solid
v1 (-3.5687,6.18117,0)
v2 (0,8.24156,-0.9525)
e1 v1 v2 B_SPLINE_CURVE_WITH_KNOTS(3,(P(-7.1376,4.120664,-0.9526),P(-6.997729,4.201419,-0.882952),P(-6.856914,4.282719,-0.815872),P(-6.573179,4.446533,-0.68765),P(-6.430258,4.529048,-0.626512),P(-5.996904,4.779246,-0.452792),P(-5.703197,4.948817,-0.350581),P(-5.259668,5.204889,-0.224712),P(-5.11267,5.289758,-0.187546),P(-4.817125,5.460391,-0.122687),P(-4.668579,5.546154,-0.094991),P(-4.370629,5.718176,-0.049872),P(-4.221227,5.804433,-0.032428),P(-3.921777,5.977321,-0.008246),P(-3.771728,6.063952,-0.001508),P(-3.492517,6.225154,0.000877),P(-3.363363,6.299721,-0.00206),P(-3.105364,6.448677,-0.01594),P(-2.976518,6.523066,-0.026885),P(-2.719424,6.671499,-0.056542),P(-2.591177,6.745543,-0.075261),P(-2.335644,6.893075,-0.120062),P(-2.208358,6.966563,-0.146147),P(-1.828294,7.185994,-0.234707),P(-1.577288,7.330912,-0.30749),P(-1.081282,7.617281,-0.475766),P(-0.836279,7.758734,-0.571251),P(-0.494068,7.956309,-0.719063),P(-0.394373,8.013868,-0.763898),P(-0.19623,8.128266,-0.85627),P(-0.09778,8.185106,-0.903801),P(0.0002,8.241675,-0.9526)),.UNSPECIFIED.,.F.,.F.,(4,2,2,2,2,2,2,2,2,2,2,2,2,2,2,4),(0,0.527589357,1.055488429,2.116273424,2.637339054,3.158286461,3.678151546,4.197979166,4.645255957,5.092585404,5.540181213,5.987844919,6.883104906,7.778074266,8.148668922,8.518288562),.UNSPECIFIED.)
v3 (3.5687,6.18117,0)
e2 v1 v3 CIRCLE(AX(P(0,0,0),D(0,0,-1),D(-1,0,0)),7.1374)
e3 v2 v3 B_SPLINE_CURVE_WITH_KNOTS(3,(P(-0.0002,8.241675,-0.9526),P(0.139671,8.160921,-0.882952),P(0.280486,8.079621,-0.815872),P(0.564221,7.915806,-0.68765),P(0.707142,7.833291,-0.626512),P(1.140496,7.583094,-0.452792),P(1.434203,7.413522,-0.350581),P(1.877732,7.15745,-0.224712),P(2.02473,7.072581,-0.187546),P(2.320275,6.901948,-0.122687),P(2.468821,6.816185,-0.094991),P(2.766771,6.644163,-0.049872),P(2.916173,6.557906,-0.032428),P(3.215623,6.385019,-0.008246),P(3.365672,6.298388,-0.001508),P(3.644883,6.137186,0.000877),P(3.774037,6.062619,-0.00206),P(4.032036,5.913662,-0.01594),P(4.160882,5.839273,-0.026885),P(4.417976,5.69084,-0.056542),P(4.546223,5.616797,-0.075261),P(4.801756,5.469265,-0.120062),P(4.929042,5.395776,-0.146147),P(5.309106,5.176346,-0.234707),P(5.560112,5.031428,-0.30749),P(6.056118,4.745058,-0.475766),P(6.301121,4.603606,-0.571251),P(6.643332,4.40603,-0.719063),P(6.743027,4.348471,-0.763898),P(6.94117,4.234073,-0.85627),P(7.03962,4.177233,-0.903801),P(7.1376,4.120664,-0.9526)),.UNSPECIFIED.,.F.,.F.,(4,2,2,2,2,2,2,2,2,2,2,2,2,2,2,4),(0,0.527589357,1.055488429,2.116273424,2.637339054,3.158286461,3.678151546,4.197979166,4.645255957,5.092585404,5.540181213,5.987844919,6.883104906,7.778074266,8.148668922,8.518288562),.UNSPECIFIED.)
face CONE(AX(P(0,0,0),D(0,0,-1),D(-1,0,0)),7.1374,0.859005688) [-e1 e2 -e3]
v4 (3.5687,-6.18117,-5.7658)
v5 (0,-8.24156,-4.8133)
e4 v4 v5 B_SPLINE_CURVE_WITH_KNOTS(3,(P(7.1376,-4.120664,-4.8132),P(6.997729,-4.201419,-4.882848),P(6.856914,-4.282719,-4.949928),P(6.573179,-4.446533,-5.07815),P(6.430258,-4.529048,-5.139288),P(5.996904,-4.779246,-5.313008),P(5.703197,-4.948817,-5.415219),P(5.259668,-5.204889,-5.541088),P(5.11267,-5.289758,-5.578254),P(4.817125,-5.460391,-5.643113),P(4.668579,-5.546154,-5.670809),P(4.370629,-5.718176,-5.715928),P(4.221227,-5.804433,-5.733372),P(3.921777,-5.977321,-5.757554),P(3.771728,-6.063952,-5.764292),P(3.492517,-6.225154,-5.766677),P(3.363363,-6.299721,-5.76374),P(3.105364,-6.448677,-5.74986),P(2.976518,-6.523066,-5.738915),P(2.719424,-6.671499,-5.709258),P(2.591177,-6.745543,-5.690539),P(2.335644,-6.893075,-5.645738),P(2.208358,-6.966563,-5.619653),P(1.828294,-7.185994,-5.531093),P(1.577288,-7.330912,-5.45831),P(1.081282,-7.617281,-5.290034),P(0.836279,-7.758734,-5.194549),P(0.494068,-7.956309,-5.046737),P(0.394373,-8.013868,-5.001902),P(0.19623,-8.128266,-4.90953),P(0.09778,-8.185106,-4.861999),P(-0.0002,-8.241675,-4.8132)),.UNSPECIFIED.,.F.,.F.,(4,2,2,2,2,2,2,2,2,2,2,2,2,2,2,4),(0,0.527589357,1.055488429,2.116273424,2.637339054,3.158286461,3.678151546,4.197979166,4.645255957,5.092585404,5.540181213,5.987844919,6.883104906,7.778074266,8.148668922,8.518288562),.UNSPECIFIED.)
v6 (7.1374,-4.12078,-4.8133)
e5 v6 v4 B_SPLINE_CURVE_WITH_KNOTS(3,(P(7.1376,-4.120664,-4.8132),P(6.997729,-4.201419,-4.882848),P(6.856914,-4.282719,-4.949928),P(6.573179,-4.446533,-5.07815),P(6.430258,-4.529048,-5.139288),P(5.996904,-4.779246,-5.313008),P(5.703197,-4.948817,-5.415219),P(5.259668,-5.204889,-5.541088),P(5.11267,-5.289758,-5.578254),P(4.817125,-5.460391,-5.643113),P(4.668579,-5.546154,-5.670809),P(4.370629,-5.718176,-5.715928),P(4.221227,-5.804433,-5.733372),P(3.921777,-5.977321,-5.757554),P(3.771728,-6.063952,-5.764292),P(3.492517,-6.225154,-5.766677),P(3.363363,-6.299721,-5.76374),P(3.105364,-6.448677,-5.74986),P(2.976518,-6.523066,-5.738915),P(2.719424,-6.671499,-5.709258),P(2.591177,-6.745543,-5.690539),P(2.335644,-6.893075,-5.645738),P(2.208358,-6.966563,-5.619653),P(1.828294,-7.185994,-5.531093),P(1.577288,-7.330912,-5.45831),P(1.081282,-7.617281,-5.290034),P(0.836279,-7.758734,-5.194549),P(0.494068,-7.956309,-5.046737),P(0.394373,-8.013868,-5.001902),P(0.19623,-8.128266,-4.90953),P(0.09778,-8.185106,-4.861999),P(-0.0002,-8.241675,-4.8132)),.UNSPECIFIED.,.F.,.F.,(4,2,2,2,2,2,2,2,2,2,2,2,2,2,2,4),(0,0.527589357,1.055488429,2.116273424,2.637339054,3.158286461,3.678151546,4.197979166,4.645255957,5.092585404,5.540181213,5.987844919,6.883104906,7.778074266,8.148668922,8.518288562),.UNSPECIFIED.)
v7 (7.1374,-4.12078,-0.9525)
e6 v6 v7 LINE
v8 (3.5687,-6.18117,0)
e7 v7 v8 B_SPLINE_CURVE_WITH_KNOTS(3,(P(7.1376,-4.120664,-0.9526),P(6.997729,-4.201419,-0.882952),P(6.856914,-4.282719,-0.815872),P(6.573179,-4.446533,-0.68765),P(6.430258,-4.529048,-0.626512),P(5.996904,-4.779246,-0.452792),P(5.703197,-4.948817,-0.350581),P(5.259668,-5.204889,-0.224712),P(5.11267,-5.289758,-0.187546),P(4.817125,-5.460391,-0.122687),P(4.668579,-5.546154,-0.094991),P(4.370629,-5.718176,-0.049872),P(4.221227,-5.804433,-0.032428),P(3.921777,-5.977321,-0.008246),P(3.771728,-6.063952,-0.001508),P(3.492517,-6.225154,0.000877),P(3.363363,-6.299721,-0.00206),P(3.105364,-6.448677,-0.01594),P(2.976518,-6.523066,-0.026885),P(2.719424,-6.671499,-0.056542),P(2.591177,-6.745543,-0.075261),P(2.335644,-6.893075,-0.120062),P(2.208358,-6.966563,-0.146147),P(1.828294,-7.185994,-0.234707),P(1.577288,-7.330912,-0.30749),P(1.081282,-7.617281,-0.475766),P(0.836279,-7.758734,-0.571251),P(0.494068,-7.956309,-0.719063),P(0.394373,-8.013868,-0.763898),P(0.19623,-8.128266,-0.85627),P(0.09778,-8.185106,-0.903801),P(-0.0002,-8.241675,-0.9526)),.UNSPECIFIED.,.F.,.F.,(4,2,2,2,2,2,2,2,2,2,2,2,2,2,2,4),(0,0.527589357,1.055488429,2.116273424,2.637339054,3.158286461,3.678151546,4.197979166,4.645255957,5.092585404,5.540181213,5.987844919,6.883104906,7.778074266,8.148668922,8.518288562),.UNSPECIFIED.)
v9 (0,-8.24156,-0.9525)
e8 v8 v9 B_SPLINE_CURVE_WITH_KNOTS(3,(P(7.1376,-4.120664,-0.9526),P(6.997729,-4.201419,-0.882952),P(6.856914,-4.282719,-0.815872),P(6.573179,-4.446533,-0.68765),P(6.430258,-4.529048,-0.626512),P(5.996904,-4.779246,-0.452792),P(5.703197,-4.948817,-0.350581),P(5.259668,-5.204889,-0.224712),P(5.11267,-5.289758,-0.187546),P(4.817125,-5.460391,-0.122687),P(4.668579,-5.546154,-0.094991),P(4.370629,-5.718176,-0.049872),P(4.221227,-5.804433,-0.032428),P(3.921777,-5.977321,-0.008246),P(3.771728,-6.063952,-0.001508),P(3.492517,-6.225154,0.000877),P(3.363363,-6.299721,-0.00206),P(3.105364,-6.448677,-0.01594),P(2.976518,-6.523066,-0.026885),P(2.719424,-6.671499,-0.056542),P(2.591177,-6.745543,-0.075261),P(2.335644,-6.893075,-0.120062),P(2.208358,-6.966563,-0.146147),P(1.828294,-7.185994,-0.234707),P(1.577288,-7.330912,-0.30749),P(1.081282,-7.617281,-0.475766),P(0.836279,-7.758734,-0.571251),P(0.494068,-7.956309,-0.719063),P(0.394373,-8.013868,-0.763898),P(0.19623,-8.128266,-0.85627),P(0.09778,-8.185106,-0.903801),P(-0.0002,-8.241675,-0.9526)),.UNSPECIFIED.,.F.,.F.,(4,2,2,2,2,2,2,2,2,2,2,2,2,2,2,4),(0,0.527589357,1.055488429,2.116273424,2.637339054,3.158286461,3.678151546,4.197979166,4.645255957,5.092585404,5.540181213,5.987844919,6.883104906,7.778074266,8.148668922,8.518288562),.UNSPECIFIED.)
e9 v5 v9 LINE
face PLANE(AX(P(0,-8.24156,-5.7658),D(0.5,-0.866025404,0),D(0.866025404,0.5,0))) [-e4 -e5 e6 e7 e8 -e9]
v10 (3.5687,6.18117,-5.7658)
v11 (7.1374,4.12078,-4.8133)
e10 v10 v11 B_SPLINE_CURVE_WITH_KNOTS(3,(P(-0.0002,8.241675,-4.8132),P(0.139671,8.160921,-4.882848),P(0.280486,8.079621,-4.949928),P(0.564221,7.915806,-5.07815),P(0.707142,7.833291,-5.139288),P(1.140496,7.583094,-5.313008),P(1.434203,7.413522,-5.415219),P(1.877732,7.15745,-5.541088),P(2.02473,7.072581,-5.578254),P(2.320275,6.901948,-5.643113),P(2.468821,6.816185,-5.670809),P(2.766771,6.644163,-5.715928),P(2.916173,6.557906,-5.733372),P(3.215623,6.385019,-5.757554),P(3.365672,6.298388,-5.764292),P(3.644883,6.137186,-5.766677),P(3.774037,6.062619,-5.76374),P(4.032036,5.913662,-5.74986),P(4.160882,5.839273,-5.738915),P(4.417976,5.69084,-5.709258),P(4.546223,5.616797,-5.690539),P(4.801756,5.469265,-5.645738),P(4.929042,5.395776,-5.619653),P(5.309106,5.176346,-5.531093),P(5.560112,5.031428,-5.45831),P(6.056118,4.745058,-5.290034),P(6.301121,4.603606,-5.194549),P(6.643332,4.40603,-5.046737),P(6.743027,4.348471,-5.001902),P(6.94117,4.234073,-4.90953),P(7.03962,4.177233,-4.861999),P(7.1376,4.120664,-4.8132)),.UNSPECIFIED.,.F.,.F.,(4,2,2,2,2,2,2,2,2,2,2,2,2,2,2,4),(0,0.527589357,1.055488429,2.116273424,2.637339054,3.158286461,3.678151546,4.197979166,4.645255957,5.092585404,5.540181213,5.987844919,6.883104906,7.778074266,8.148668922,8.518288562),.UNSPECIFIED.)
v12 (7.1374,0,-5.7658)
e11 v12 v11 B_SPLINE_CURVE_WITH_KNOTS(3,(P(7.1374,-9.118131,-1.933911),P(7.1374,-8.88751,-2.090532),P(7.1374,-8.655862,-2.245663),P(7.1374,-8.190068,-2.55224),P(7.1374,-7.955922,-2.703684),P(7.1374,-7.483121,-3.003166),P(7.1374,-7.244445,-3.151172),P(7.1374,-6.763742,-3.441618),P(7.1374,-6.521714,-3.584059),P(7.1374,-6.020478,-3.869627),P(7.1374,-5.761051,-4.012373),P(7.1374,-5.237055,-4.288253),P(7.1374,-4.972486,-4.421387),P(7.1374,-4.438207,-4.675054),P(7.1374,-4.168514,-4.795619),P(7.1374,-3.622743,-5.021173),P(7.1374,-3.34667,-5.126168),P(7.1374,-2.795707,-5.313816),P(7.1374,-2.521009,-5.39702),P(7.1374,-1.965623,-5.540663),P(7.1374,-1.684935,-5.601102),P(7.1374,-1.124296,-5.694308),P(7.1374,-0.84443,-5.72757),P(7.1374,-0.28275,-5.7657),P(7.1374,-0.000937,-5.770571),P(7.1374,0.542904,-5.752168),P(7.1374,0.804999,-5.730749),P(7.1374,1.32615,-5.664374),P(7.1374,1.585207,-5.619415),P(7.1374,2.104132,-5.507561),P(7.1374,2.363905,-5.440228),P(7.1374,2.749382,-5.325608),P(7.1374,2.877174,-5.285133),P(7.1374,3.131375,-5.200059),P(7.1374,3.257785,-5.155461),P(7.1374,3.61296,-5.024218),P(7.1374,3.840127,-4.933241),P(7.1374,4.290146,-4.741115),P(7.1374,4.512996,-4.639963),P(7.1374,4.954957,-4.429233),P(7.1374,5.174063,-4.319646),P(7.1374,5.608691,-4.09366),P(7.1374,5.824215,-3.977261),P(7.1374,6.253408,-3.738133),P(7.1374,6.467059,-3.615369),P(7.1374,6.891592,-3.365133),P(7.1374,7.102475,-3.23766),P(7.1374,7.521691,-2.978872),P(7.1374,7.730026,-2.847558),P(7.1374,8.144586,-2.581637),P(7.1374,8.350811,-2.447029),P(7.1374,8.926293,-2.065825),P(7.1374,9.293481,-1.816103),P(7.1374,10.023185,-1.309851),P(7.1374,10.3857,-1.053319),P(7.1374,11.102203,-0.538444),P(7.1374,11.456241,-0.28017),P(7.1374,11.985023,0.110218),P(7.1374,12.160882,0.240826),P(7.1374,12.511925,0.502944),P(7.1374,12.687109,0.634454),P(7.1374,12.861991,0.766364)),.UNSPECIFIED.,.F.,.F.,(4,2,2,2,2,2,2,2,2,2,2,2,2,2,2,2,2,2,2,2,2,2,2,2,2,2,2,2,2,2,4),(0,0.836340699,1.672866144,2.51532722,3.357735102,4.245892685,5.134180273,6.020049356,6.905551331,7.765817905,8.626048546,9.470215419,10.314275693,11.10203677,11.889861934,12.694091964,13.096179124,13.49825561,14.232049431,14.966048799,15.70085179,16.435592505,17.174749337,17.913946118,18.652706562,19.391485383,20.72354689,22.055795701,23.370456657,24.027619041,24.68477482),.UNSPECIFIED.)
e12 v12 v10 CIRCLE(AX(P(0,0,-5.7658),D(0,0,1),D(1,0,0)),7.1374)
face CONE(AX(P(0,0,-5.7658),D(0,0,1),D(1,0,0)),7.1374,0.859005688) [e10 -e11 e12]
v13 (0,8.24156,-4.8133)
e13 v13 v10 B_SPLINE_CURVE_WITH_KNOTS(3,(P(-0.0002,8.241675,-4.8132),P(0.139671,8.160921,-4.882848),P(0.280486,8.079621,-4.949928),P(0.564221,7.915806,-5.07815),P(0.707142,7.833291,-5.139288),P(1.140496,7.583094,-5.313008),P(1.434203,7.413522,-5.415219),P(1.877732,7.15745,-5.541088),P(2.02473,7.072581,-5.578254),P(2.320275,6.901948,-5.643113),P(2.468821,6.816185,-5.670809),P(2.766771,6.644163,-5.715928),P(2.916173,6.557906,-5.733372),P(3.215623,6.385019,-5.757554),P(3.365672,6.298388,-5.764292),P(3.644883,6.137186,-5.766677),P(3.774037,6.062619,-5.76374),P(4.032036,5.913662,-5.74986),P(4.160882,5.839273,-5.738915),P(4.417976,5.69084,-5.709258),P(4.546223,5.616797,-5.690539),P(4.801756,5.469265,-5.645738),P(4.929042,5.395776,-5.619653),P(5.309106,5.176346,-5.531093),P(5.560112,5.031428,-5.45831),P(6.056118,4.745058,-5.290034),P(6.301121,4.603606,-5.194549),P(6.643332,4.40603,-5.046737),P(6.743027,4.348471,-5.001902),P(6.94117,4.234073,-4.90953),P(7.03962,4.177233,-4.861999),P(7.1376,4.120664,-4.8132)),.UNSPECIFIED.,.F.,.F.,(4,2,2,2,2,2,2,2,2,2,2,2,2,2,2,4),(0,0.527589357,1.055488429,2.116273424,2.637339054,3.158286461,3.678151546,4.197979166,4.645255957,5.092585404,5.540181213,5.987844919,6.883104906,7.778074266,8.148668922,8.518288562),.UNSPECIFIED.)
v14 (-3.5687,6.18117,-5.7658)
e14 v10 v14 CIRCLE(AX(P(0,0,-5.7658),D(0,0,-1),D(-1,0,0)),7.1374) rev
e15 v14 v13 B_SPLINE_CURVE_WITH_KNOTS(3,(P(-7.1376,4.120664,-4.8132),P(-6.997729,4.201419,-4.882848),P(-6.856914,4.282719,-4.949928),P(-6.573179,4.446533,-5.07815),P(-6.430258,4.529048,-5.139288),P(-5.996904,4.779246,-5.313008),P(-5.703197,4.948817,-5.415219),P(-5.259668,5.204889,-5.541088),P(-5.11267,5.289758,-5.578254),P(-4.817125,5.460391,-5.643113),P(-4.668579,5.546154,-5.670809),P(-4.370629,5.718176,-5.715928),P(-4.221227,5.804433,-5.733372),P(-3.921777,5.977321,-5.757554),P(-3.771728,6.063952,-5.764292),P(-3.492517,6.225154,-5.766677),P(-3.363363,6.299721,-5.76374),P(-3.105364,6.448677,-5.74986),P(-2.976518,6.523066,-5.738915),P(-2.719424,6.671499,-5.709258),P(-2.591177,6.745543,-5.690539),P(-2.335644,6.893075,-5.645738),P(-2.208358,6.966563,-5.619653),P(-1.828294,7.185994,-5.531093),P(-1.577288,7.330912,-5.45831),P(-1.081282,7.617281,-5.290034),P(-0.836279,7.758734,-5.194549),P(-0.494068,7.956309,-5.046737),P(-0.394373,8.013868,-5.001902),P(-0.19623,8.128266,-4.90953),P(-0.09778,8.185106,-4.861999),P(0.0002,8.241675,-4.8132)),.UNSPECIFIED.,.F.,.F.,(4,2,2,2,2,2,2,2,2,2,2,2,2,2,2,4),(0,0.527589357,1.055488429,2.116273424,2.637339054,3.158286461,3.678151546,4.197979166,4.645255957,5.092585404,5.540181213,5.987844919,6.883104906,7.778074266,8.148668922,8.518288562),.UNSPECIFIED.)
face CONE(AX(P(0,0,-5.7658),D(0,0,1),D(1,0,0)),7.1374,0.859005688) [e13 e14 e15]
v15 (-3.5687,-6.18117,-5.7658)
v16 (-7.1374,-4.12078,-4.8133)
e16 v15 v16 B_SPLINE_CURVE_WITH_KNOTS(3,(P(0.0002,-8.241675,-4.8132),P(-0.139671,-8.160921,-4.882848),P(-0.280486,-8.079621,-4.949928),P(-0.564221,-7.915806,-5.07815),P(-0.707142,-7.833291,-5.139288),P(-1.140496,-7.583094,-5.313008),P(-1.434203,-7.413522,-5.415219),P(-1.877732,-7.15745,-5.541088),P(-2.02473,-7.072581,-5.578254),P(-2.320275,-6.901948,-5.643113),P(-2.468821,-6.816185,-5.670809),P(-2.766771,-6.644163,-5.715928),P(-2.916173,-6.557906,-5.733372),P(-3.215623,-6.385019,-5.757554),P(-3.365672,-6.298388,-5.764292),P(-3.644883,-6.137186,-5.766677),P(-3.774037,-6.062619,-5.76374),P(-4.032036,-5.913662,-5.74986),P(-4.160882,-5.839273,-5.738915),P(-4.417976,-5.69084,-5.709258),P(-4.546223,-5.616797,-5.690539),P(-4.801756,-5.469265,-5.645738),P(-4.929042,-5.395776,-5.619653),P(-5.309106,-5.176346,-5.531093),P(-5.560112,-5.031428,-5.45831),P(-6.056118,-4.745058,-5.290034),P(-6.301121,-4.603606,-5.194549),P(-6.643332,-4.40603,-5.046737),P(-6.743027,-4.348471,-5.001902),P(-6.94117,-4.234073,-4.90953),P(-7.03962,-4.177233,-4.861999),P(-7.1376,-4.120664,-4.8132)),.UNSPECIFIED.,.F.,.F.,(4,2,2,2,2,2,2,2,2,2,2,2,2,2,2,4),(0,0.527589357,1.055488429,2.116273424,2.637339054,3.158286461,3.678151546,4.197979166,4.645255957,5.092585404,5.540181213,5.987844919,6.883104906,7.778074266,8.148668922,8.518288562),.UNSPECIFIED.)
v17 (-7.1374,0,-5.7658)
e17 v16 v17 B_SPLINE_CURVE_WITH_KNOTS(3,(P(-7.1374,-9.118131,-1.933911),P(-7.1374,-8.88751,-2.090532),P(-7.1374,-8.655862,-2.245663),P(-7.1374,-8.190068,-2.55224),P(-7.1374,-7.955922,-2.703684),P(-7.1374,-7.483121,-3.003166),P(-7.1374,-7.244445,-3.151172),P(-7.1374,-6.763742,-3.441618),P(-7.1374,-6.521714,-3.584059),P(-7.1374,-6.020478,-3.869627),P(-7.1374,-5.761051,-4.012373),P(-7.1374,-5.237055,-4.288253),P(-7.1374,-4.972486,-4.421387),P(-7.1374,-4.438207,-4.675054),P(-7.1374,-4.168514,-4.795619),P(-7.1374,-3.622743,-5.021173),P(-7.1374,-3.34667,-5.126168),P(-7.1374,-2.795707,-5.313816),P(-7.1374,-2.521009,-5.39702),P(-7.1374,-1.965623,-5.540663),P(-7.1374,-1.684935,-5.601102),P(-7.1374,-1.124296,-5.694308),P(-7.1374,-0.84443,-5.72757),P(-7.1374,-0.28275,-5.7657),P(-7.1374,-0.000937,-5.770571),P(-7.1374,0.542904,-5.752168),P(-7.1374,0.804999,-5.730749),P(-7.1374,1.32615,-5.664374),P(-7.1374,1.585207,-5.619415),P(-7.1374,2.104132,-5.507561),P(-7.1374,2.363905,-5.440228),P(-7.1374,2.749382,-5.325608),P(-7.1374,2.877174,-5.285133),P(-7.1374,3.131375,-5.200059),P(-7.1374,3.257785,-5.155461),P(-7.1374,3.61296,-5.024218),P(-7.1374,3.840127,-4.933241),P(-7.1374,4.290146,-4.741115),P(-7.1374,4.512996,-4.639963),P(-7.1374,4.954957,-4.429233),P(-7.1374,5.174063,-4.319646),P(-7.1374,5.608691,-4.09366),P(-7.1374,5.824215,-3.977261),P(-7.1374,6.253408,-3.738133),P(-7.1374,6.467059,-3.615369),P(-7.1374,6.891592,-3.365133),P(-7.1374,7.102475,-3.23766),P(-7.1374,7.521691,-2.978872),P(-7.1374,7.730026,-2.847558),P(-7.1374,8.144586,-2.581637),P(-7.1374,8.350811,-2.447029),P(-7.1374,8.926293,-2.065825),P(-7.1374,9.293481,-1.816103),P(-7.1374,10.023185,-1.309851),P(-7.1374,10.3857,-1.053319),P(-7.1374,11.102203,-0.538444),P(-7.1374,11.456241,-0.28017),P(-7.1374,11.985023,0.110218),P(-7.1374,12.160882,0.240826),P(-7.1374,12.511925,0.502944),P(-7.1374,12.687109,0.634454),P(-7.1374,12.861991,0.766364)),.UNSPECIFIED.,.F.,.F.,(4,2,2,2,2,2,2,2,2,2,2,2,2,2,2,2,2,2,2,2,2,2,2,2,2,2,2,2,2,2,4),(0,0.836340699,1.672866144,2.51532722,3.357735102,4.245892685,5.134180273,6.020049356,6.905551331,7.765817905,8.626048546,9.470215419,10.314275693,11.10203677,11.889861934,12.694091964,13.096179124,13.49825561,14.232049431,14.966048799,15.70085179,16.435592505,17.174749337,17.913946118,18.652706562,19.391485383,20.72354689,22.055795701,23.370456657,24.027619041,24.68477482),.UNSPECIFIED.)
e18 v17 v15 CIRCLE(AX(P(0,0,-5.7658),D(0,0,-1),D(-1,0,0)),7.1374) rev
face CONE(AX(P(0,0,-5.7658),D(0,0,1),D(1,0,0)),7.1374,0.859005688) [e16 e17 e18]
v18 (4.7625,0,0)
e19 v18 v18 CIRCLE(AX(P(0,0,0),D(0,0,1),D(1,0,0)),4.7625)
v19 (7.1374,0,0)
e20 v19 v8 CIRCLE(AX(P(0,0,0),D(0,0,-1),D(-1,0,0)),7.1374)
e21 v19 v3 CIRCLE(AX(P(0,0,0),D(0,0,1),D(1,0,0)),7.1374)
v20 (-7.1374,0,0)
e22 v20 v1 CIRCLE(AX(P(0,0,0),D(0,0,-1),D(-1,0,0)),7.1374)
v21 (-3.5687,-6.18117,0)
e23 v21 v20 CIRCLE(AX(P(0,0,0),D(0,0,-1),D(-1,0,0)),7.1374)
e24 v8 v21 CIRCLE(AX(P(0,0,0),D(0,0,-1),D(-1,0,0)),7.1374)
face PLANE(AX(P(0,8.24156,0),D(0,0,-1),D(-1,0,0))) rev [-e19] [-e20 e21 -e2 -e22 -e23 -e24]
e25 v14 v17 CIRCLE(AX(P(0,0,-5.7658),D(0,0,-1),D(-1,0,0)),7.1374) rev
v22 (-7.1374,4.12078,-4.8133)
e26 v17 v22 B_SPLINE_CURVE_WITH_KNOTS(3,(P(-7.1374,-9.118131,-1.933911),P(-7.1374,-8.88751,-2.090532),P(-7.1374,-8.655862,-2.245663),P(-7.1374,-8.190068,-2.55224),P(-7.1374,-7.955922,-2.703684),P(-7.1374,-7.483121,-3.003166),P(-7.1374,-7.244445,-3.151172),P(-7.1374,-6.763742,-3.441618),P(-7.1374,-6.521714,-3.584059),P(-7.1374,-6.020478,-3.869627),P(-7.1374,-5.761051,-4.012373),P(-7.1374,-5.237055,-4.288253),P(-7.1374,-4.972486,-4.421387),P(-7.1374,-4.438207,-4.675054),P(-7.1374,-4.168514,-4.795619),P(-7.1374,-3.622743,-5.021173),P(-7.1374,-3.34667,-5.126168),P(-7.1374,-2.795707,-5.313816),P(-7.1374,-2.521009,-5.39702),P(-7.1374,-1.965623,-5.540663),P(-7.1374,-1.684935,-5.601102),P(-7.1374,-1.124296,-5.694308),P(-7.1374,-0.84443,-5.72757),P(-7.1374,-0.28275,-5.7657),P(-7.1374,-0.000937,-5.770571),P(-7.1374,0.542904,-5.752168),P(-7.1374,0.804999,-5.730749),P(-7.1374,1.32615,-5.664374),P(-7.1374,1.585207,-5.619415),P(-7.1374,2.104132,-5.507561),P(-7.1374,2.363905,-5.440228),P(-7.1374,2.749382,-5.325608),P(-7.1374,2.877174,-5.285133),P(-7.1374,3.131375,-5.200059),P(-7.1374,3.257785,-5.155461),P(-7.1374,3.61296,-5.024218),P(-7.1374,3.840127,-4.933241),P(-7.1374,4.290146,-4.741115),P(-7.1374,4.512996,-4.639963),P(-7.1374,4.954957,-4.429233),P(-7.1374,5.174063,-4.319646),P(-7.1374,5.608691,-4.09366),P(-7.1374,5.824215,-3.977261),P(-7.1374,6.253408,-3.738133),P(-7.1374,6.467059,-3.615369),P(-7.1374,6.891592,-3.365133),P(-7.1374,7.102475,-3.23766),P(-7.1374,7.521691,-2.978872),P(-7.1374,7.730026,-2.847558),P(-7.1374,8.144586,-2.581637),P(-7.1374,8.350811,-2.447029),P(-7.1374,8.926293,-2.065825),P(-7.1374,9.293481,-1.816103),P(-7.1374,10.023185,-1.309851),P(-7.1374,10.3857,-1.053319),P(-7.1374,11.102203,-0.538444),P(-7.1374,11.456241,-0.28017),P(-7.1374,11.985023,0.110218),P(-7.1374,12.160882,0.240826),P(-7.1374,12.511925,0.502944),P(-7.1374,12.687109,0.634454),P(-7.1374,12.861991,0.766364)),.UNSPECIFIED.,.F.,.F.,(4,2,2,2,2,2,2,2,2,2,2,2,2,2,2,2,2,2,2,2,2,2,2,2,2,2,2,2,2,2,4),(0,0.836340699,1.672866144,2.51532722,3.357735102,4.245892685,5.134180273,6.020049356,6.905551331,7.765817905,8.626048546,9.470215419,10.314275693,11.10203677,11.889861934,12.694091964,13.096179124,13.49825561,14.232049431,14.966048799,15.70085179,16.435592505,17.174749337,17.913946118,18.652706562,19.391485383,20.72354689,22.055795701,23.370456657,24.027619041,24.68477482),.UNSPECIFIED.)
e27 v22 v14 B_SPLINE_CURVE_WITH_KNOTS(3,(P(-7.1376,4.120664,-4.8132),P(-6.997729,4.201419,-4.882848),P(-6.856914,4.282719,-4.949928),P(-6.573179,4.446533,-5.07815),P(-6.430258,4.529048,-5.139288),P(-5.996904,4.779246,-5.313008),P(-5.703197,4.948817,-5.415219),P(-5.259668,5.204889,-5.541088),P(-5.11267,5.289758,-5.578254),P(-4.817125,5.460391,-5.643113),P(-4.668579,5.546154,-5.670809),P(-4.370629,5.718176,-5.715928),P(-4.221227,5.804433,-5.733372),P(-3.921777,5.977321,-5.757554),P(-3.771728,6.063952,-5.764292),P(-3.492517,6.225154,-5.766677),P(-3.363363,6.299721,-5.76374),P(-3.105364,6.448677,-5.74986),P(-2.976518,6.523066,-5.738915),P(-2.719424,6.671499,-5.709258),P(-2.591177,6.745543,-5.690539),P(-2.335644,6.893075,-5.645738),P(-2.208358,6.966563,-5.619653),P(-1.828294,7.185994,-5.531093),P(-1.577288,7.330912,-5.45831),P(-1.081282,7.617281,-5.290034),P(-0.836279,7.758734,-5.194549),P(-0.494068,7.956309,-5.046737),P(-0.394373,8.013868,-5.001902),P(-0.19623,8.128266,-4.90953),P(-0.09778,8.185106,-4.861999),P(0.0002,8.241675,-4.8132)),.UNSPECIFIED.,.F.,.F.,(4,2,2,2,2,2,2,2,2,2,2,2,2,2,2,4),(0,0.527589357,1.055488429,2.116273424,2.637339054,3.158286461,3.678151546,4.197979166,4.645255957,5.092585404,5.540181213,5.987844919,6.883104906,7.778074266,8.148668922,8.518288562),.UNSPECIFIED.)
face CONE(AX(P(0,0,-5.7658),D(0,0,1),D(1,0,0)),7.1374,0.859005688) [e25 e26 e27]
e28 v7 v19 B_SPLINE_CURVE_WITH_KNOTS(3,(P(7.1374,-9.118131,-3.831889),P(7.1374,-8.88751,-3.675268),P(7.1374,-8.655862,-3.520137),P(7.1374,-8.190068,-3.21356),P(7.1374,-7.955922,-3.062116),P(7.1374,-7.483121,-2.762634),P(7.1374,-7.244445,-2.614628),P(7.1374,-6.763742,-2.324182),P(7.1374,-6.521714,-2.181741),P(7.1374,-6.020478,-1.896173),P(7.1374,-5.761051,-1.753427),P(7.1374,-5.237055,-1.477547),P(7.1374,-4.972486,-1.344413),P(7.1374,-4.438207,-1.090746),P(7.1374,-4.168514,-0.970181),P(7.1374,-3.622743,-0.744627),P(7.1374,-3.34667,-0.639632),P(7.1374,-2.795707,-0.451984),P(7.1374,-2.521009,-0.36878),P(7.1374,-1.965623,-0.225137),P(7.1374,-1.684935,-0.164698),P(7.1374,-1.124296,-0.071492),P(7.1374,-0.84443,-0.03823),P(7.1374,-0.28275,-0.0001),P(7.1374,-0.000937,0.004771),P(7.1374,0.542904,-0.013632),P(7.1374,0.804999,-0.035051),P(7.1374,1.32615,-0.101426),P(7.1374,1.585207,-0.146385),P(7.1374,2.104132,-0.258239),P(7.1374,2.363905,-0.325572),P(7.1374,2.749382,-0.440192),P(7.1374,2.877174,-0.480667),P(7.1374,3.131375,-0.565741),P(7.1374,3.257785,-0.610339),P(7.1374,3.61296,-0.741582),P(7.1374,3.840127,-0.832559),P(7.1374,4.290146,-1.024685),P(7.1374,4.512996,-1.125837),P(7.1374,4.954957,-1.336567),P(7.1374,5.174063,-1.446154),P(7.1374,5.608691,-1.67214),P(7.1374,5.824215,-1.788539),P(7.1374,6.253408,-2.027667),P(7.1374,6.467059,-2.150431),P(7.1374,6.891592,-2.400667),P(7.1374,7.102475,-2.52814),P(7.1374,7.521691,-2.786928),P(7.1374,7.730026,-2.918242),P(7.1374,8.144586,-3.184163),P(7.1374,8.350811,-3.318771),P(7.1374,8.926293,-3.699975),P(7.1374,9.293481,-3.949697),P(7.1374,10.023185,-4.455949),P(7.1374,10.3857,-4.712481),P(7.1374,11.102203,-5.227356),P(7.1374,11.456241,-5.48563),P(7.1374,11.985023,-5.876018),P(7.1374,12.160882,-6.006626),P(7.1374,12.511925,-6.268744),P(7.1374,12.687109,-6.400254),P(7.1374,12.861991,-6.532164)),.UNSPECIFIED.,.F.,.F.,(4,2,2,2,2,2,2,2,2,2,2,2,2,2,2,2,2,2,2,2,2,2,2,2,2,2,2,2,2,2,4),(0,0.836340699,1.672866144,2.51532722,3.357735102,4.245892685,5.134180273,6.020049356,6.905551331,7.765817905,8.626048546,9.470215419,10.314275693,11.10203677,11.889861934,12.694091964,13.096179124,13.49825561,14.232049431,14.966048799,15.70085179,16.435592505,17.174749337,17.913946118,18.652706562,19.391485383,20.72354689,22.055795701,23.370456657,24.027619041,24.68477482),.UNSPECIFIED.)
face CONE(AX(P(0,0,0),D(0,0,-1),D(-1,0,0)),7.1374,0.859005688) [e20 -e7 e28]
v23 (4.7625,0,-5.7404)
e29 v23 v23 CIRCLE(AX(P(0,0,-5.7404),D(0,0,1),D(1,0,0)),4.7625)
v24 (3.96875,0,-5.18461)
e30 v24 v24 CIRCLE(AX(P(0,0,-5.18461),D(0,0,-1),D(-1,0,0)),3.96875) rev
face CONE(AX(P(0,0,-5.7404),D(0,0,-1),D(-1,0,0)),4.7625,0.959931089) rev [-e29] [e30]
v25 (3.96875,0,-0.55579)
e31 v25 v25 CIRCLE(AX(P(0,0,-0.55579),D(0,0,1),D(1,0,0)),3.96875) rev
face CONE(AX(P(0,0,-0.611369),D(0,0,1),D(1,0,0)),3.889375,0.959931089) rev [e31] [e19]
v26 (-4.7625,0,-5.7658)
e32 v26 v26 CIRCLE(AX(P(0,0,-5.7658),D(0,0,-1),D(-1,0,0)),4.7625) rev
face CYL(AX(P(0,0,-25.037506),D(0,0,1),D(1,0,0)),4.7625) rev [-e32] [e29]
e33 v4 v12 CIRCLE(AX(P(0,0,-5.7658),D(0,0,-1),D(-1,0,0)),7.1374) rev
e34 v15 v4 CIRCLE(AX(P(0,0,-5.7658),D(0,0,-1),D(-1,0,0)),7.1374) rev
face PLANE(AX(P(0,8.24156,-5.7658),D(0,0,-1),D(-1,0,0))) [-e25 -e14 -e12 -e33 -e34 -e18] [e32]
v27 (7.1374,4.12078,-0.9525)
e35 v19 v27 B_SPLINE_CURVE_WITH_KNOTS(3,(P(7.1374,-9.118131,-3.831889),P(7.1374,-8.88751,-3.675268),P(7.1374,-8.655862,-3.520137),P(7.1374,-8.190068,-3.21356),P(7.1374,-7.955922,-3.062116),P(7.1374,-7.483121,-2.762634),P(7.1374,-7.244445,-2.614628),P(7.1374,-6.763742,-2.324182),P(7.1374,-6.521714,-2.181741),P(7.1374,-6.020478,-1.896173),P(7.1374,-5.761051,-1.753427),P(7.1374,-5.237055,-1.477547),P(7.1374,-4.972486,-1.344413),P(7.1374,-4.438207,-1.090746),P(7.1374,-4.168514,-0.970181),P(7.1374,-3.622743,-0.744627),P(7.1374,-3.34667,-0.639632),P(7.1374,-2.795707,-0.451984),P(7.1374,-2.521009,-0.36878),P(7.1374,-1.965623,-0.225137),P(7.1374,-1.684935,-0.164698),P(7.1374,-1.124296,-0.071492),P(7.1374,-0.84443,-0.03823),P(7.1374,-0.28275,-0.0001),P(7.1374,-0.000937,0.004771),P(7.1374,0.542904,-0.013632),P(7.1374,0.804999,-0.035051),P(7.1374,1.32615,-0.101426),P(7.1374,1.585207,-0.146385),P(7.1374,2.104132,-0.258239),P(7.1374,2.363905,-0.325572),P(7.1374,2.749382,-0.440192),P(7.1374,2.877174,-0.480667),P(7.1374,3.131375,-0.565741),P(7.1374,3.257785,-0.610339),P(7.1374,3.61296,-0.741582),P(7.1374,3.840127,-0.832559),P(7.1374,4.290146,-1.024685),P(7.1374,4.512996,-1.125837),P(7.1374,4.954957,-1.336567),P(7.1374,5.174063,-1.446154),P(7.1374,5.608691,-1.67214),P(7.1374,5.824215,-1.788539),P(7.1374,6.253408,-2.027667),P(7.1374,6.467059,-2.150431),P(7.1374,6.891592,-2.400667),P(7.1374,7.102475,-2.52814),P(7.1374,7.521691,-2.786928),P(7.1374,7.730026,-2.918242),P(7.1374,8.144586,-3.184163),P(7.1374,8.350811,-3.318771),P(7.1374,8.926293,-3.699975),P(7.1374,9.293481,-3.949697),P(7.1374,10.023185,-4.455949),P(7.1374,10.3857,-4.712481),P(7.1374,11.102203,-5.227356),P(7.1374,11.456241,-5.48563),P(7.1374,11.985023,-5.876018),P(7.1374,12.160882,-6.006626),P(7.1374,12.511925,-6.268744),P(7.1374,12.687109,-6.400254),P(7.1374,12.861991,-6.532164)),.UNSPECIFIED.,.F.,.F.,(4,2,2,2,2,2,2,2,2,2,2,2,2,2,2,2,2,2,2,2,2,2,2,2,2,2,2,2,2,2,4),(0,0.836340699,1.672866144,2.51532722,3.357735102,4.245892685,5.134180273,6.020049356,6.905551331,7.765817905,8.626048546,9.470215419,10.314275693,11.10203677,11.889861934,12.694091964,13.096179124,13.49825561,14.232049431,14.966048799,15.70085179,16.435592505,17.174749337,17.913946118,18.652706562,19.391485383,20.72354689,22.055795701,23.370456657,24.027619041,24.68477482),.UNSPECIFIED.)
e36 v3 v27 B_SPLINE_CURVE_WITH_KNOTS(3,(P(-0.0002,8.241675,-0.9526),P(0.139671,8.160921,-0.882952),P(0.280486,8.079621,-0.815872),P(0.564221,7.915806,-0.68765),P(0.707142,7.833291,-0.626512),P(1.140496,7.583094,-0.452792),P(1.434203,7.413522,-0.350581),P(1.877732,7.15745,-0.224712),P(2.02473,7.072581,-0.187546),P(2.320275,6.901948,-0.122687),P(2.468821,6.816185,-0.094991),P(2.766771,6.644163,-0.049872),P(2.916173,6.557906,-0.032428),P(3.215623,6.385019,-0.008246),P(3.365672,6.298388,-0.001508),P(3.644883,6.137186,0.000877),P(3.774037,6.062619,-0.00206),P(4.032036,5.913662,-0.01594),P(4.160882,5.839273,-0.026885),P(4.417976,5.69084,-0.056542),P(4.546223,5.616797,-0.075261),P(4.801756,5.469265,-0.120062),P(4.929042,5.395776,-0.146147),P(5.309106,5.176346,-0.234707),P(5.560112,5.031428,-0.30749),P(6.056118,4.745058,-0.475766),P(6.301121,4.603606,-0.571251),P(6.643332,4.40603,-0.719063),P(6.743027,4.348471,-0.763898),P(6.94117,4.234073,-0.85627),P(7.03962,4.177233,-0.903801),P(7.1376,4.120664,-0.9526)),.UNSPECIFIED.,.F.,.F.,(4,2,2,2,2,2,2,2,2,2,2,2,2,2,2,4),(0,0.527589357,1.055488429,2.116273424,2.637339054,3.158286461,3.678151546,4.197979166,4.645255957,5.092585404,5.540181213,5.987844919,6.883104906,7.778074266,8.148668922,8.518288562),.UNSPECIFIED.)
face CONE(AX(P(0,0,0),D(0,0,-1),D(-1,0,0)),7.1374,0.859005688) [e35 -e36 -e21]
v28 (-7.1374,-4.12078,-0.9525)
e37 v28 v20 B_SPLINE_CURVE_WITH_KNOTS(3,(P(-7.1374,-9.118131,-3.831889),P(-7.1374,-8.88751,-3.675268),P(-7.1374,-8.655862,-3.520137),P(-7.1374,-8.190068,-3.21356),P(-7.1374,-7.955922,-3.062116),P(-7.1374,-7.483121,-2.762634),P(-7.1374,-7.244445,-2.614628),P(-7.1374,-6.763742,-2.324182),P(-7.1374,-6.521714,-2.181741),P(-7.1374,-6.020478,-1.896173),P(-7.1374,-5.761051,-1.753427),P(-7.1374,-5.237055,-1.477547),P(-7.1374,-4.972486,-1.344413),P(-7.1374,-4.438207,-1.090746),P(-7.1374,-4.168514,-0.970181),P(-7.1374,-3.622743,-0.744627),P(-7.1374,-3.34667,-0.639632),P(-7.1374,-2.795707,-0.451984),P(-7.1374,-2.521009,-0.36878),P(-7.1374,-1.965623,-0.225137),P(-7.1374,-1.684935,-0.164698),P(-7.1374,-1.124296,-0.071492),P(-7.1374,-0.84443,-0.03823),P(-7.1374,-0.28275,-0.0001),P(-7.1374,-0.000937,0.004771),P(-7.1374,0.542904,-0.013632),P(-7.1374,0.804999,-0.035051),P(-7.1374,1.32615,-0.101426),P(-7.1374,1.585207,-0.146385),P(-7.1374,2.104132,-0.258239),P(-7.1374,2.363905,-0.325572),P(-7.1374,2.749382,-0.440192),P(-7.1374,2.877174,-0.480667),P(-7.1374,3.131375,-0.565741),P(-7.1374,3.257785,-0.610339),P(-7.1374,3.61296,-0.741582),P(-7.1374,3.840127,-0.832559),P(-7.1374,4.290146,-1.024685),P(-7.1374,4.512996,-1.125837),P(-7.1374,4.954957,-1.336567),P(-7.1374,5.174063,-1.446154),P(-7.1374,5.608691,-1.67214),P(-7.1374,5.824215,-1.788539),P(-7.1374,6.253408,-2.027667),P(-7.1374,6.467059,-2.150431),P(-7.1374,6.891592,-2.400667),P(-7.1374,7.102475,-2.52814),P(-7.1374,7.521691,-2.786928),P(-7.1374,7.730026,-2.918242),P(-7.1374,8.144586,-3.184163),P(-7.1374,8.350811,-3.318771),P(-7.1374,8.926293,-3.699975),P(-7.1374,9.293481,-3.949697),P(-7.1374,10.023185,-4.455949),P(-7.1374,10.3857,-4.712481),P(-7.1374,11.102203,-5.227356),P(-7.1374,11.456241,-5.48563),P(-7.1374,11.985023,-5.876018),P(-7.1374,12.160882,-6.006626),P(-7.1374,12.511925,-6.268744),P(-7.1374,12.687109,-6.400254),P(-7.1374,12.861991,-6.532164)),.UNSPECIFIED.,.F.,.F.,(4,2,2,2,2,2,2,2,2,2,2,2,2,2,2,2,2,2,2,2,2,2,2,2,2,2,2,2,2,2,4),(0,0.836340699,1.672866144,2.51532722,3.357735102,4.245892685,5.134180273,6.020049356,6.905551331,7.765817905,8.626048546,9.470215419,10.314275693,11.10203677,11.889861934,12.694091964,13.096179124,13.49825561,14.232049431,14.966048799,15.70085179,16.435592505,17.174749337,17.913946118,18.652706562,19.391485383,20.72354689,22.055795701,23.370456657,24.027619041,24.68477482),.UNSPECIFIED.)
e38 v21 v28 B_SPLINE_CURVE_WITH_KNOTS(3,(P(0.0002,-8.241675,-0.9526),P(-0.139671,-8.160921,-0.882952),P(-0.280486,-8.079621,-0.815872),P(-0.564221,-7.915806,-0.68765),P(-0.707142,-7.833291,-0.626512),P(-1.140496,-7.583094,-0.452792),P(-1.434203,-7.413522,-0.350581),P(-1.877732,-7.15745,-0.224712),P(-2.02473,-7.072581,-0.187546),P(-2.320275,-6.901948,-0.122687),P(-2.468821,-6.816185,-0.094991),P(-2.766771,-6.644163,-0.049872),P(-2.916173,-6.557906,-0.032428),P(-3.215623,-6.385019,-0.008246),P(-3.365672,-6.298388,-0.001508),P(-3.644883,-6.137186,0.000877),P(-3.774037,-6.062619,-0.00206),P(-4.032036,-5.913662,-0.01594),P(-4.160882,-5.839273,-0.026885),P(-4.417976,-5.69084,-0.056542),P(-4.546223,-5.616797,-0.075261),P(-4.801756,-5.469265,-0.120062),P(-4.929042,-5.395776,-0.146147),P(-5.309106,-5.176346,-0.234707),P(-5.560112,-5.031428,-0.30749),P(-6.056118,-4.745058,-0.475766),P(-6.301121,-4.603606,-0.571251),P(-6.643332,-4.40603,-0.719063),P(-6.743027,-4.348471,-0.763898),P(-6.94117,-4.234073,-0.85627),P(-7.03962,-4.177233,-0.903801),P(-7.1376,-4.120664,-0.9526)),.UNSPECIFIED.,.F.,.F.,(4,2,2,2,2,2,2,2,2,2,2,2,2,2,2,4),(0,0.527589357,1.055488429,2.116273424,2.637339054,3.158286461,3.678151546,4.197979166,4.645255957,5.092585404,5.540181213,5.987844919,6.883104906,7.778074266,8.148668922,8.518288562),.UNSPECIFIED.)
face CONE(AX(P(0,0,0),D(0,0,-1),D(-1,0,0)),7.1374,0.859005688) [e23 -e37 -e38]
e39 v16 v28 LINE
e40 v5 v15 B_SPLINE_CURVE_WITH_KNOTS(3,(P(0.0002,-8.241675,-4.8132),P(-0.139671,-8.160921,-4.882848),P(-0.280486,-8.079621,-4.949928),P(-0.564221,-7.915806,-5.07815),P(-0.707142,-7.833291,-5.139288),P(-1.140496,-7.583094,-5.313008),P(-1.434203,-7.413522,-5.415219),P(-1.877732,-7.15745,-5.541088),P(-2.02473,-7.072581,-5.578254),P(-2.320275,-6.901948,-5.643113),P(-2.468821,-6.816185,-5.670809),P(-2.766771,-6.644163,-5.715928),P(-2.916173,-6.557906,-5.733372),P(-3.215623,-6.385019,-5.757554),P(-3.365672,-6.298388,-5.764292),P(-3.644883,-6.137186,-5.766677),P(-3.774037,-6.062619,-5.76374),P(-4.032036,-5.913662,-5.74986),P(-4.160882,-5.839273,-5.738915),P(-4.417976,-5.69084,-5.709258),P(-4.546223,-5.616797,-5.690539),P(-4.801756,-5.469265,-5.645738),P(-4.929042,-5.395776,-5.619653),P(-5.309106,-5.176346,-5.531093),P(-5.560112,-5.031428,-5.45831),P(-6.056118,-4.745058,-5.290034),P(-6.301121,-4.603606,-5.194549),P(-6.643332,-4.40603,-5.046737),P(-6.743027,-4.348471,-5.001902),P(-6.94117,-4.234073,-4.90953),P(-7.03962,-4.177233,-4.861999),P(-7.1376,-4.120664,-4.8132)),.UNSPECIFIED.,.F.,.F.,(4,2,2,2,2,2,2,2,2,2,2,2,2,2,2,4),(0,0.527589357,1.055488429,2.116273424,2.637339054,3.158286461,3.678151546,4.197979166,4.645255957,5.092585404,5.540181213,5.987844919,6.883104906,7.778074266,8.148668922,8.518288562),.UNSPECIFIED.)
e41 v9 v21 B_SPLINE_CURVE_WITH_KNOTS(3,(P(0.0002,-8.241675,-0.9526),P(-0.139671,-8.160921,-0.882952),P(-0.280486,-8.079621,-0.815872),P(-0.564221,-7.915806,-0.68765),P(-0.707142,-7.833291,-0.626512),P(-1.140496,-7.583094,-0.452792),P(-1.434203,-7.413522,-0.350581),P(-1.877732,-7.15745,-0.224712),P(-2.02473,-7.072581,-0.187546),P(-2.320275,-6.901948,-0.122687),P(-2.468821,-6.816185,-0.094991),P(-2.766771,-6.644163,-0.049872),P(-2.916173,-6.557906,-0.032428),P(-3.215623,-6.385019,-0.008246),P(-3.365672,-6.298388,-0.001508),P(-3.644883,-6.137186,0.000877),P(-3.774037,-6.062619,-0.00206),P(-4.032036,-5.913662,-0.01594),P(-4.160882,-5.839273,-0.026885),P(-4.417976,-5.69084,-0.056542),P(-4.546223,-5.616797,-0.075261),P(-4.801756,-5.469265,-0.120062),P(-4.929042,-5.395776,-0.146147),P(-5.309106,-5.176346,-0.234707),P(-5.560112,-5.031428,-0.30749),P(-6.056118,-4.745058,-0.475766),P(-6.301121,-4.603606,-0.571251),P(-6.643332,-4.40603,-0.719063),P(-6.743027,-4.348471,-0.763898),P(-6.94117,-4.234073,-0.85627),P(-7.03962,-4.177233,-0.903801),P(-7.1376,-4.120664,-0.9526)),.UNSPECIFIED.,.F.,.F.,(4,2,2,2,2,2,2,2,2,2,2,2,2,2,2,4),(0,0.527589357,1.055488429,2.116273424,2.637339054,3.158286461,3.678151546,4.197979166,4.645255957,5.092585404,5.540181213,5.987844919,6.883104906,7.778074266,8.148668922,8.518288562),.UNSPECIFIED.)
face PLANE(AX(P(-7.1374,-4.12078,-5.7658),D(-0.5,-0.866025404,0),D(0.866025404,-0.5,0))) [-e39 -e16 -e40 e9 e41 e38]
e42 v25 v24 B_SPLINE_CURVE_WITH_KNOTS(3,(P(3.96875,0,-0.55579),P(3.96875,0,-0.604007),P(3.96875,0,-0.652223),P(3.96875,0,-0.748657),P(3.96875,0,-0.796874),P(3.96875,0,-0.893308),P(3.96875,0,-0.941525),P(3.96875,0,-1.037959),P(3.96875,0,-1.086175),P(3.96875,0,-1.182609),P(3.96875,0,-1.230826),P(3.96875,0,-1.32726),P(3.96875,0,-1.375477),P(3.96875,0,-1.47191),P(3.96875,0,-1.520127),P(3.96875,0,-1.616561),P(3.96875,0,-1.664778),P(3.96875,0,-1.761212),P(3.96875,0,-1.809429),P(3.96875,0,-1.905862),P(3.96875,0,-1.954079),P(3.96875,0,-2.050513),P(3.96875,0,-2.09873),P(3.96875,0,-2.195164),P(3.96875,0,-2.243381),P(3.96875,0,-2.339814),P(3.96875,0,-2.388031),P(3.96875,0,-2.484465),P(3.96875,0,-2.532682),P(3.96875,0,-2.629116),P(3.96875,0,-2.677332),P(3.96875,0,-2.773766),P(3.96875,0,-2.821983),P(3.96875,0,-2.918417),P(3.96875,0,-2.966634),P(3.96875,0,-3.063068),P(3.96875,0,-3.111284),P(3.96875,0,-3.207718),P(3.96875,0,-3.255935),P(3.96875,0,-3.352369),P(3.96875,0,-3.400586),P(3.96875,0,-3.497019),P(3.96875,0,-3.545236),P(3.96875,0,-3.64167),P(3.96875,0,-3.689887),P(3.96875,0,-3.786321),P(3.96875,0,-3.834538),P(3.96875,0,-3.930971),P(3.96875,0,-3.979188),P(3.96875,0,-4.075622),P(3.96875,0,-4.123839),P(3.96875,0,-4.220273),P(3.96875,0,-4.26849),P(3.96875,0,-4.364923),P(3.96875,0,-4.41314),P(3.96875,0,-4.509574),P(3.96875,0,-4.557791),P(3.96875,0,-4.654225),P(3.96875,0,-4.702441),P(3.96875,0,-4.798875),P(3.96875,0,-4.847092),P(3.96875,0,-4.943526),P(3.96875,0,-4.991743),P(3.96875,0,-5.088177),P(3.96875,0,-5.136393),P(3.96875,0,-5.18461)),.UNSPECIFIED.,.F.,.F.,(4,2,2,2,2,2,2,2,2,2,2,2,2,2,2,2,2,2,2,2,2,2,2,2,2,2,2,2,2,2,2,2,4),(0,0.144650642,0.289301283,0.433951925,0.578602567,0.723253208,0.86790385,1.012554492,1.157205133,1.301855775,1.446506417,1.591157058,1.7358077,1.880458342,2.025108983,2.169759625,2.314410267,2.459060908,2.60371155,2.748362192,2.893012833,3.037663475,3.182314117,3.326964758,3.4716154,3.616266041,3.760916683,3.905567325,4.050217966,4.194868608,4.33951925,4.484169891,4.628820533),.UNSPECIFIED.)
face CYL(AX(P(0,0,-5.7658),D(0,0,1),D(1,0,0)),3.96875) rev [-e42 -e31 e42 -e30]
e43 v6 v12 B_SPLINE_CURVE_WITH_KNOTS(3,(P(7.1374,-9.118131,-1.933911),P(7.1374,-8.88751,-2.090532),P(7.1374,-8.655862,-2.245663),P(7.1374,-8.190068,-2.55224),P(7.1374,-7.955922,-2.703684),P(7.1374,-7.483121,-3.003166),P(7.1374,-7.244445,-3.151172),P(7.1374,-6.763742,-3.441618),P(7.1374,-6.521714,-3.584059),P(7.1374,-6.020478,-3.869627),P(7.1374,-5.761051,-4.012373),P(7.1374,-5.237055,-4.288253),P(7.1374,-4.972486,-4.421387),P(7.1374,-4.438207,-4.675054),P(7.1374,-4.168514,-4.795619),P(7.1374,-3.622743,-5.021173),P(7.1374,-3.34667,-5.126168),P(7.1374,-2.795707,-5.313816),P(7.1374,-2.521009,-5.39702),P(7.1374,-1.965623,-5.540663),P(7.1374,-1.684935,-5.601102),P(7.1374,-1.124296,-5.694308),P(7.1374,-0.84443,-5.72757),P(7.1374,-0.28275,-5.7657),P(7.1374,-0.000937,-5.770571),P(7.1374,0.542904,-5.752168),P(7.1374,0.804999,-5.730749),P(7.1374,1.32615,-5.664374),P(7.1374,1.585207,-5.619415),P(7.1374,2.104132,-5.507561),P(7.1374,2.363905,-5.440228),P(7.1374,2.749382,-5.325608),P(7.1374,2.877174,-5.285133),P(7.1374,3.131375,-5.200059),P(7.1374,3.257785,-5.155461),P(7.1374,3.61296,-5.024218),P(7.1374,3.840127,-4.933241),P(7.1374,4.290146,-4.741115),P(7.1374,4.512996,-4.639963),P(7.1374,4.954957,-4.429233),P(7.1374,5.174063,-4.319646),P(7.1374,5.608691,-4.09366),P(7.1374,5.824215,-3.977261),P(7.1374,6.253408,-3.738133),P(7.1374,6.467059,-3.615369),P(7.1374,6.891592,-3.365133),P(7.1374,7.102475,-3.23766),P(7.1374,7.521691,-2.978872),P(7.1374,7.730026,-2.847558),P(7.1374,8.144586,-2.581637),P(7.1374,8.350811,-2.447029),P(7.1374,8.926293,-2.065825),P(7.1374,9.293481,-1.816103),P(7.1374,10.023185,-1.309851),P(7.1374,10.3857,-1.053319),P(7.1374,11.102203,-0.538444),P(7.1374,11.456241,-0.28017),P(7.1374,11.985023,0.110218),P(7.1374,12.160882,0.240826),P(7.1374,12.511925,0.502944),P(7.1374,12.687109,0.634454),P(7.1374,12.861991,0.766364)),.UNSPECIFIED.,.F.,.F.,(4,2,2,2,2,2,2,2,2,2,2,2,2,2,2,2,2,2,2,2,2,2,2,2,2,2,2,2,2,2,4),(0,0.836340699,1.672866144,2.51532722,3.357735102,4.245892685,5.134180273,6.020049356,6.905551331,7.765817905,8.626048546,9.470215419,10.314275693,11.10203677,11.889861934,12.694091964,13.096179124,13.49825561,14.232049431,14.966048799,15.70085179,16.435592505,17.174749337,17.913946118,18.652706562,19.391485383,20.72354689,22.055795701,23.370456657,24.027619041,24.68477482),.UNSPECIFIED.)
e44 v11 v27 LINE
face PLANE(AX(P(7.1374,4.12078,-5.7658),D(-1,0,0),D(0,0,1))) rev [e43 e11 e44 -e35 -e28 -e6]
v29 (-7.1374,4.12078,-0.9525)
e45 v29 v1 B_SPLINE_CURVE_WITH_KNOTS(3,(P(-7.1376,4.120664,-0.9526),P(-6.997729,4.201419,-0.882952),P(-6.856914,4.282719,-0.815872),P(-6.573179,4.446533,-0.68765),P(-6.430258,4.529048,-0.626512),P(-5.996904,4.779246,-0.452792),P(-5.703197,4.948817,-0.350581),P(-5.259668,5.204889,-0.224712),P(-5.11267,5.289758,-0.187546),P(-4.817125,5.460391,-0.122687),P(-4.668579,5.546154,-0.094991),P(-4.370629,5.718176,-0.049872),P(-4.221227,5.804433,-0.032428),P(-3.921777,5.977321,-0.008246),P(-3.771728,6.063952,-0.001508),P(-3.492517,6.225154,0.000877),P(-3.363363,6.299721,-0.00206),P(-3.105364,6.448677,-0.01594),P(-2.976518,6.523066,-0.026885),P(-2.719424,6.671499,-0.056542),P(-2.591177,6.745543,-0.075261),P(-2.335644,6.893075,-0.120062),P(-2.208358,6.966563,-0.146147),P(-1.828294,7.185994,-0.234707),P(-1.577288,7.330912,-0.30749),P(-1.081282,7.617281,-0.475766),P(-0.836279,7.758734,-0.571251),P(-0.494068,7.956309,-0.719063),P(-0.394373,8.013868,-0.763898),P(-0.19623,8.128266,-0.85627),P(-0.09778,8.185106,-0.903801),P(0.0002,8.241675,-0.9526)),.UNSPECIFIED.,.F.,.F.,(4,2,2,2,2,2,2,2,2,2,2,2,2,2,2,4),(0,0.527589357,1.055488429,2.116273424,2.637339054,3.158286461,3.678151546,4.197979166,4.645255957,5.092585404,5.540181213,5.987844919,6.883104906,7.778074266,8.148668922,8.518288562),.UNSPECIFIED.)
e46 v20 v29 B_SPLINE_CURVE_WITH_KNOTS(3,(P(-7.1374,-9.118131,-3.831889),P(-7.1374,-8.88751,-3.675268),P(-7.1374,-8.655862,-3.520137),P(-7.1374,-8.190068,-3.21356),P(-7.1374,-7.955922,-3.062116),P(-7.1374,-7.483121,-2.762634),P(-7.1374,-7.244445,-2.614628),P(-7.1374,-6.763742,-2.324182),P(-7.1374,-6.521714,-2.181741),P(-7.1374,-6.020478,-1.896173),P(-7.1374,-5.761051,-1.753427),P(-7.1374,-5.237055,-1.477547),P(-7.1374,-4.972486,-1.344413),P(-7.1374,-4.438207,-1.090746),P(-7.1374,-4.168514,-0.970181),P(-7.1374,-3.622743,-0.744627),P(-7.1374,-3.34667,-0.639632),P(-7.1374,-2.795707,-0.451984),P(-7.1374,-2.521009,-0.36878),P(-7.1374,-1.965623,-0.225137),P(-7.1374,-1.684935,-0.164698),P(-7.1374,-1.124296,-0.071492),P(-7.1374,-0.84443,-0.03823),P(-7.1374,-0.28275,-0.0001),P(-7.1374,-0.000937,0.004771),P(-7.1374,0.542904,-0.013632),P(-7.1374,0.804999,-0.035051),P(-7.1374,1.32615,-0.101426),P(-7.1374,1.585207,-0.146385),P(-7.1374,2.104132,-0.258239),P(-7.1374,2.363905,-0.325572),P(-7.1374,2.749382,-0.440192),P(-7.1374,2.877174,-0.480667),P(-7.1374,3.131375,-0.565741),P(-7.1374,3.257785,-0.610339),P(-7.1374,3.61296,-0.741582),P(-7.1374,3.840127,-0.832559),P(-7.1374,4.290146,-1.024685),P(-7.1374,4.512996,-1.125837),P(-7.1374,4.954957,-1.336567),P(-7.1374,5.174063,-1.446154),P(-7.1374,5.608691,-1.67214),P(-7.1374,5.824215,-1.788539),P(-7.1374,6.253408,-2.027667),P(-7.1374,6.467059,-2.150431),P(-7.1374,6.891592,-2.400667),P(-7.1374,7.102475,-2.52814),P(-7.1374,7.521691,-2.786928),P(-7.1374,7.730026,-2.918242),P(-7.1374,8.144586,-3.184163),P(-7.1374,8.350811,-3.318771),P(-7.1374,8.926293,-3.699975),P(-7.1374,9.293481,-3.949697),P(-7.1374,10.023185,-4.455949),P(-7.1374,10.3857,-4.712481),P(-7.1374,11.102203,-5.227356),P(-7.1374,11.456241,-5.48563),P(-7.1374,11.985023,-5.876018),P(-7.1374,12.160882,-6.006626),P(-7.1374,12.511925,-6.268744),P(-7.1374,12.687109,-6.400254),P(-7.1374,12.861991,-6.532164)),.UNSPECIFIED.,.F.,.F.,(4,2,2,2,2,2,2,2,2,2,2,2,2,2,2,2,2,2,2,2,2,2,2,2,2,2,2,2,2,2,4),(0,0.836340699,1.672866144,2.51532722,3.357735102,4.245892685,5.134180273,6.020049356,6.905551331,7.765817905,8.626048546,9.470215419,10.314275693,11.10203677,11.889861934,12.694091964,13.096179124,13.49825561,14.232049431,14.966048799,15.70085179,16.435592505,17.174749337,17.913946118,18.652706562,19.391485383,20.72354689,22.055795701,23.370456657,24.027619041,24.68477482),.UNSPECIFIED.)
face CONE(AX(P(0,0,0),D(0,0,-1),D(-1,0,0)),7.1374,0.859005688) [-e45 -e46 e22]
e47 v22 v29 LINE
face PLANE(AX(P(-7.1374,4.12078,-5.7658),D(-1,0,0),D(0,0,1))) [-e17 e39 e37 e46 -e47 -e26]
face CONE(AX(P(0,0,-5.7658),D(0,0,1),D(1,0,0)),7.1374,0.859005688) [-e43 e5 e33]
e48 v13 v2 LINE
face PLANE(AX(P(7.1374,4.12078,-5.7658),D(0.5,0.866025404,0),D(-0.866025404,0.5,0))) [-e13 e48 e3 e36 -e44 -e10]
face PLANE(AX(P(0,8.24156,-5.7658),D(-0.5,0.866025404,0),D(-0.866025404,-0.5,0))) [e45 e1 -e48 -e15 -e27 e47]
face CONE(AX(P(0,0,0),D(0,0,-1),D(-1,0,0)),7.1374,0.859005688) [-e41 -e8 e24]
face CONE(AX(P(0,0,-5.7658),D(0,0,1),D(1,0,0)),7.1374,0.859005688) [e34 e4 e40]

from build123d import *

# Parameters (mm, degrees)
THREADSCHEMATIC_START     = -5.7658
THREADSCHEMATIC_OUTLINE_R = 3.96875
THREADSCHEMATIC_DEPTH     = 5.7658


# Read off the part's stored shape, not the designer's step: ThreadSchematic
with BuildPart() as part:
    # ThreadSchematic outline → ThreadSchematic (new body)
    with BuildSketch(Plane.XY.offset(THREADSCHEMATIC_START)):
        Polygon((7.1374, 4.120779811), (0, 8.241559623), (-7.1374, 4.120779811), (-7.1374, -4.120779811), (0, -8.241559623), (7.1374, -4.120779811), align=None)
        Circle(THREADSCHEMATIC_OUTLINE_R, mode=Mode.SUBTRACT)
    extrude(amount=THREADSCHEMATIC_DEPTH)

    # Sketch3 → Double-Chamfer (revolve, cut)
    with BuildSketch(Plane(origin=(0, 0, 0), x_dir=(0, 0, -1), z_dir=(1, 0, 0))):
        Polygon((5.7658, 7.1374), (4.8133, 8.241559623), (4.8133, 20.941559623), (18.4658, 20.941559623), (18.4658, 7.1374), align=None)
        Polygon((0.9525, 20.941559623), (-12.7, 20.941559623), (-12.7, 7.1374), (0, 7.1374), (0.9525, 8.241559623), align=None)
    revolve(axis=Axis((0, 0, 0), (0, 0, -1)), mode=Mode.SUBTRACT)

    # EndChamferSke → EndChamfer (revolve, cut)
    with BuildSketch(Plane(origin=(0, 0, 0), x_dir=(0, 0, -1), z_dir=(1, 0, 0)), mode=Mode.PRIVATE) as endchamfer_sk:
        Polygon((5.7404, 4.7625), (5.129031293, 3.889375), (5.7912, 3.889375), (5.7912, 4.7625), align=None)
        Polygon((-0.0508, 4.7625), (0, 4.7625), (0.611368707, 3.889375), (-0.0508, 3.889375), align=None)
    revolve(endchamfer_sk.sketch.rotate(Axis((0, 0, -25.037505729), (0, 0, -1)), 90), axis=Axis((0, 0, -25.037505729), (0, 0, -1)), mode=Mode.SUBTRACT)


solid = part.part
